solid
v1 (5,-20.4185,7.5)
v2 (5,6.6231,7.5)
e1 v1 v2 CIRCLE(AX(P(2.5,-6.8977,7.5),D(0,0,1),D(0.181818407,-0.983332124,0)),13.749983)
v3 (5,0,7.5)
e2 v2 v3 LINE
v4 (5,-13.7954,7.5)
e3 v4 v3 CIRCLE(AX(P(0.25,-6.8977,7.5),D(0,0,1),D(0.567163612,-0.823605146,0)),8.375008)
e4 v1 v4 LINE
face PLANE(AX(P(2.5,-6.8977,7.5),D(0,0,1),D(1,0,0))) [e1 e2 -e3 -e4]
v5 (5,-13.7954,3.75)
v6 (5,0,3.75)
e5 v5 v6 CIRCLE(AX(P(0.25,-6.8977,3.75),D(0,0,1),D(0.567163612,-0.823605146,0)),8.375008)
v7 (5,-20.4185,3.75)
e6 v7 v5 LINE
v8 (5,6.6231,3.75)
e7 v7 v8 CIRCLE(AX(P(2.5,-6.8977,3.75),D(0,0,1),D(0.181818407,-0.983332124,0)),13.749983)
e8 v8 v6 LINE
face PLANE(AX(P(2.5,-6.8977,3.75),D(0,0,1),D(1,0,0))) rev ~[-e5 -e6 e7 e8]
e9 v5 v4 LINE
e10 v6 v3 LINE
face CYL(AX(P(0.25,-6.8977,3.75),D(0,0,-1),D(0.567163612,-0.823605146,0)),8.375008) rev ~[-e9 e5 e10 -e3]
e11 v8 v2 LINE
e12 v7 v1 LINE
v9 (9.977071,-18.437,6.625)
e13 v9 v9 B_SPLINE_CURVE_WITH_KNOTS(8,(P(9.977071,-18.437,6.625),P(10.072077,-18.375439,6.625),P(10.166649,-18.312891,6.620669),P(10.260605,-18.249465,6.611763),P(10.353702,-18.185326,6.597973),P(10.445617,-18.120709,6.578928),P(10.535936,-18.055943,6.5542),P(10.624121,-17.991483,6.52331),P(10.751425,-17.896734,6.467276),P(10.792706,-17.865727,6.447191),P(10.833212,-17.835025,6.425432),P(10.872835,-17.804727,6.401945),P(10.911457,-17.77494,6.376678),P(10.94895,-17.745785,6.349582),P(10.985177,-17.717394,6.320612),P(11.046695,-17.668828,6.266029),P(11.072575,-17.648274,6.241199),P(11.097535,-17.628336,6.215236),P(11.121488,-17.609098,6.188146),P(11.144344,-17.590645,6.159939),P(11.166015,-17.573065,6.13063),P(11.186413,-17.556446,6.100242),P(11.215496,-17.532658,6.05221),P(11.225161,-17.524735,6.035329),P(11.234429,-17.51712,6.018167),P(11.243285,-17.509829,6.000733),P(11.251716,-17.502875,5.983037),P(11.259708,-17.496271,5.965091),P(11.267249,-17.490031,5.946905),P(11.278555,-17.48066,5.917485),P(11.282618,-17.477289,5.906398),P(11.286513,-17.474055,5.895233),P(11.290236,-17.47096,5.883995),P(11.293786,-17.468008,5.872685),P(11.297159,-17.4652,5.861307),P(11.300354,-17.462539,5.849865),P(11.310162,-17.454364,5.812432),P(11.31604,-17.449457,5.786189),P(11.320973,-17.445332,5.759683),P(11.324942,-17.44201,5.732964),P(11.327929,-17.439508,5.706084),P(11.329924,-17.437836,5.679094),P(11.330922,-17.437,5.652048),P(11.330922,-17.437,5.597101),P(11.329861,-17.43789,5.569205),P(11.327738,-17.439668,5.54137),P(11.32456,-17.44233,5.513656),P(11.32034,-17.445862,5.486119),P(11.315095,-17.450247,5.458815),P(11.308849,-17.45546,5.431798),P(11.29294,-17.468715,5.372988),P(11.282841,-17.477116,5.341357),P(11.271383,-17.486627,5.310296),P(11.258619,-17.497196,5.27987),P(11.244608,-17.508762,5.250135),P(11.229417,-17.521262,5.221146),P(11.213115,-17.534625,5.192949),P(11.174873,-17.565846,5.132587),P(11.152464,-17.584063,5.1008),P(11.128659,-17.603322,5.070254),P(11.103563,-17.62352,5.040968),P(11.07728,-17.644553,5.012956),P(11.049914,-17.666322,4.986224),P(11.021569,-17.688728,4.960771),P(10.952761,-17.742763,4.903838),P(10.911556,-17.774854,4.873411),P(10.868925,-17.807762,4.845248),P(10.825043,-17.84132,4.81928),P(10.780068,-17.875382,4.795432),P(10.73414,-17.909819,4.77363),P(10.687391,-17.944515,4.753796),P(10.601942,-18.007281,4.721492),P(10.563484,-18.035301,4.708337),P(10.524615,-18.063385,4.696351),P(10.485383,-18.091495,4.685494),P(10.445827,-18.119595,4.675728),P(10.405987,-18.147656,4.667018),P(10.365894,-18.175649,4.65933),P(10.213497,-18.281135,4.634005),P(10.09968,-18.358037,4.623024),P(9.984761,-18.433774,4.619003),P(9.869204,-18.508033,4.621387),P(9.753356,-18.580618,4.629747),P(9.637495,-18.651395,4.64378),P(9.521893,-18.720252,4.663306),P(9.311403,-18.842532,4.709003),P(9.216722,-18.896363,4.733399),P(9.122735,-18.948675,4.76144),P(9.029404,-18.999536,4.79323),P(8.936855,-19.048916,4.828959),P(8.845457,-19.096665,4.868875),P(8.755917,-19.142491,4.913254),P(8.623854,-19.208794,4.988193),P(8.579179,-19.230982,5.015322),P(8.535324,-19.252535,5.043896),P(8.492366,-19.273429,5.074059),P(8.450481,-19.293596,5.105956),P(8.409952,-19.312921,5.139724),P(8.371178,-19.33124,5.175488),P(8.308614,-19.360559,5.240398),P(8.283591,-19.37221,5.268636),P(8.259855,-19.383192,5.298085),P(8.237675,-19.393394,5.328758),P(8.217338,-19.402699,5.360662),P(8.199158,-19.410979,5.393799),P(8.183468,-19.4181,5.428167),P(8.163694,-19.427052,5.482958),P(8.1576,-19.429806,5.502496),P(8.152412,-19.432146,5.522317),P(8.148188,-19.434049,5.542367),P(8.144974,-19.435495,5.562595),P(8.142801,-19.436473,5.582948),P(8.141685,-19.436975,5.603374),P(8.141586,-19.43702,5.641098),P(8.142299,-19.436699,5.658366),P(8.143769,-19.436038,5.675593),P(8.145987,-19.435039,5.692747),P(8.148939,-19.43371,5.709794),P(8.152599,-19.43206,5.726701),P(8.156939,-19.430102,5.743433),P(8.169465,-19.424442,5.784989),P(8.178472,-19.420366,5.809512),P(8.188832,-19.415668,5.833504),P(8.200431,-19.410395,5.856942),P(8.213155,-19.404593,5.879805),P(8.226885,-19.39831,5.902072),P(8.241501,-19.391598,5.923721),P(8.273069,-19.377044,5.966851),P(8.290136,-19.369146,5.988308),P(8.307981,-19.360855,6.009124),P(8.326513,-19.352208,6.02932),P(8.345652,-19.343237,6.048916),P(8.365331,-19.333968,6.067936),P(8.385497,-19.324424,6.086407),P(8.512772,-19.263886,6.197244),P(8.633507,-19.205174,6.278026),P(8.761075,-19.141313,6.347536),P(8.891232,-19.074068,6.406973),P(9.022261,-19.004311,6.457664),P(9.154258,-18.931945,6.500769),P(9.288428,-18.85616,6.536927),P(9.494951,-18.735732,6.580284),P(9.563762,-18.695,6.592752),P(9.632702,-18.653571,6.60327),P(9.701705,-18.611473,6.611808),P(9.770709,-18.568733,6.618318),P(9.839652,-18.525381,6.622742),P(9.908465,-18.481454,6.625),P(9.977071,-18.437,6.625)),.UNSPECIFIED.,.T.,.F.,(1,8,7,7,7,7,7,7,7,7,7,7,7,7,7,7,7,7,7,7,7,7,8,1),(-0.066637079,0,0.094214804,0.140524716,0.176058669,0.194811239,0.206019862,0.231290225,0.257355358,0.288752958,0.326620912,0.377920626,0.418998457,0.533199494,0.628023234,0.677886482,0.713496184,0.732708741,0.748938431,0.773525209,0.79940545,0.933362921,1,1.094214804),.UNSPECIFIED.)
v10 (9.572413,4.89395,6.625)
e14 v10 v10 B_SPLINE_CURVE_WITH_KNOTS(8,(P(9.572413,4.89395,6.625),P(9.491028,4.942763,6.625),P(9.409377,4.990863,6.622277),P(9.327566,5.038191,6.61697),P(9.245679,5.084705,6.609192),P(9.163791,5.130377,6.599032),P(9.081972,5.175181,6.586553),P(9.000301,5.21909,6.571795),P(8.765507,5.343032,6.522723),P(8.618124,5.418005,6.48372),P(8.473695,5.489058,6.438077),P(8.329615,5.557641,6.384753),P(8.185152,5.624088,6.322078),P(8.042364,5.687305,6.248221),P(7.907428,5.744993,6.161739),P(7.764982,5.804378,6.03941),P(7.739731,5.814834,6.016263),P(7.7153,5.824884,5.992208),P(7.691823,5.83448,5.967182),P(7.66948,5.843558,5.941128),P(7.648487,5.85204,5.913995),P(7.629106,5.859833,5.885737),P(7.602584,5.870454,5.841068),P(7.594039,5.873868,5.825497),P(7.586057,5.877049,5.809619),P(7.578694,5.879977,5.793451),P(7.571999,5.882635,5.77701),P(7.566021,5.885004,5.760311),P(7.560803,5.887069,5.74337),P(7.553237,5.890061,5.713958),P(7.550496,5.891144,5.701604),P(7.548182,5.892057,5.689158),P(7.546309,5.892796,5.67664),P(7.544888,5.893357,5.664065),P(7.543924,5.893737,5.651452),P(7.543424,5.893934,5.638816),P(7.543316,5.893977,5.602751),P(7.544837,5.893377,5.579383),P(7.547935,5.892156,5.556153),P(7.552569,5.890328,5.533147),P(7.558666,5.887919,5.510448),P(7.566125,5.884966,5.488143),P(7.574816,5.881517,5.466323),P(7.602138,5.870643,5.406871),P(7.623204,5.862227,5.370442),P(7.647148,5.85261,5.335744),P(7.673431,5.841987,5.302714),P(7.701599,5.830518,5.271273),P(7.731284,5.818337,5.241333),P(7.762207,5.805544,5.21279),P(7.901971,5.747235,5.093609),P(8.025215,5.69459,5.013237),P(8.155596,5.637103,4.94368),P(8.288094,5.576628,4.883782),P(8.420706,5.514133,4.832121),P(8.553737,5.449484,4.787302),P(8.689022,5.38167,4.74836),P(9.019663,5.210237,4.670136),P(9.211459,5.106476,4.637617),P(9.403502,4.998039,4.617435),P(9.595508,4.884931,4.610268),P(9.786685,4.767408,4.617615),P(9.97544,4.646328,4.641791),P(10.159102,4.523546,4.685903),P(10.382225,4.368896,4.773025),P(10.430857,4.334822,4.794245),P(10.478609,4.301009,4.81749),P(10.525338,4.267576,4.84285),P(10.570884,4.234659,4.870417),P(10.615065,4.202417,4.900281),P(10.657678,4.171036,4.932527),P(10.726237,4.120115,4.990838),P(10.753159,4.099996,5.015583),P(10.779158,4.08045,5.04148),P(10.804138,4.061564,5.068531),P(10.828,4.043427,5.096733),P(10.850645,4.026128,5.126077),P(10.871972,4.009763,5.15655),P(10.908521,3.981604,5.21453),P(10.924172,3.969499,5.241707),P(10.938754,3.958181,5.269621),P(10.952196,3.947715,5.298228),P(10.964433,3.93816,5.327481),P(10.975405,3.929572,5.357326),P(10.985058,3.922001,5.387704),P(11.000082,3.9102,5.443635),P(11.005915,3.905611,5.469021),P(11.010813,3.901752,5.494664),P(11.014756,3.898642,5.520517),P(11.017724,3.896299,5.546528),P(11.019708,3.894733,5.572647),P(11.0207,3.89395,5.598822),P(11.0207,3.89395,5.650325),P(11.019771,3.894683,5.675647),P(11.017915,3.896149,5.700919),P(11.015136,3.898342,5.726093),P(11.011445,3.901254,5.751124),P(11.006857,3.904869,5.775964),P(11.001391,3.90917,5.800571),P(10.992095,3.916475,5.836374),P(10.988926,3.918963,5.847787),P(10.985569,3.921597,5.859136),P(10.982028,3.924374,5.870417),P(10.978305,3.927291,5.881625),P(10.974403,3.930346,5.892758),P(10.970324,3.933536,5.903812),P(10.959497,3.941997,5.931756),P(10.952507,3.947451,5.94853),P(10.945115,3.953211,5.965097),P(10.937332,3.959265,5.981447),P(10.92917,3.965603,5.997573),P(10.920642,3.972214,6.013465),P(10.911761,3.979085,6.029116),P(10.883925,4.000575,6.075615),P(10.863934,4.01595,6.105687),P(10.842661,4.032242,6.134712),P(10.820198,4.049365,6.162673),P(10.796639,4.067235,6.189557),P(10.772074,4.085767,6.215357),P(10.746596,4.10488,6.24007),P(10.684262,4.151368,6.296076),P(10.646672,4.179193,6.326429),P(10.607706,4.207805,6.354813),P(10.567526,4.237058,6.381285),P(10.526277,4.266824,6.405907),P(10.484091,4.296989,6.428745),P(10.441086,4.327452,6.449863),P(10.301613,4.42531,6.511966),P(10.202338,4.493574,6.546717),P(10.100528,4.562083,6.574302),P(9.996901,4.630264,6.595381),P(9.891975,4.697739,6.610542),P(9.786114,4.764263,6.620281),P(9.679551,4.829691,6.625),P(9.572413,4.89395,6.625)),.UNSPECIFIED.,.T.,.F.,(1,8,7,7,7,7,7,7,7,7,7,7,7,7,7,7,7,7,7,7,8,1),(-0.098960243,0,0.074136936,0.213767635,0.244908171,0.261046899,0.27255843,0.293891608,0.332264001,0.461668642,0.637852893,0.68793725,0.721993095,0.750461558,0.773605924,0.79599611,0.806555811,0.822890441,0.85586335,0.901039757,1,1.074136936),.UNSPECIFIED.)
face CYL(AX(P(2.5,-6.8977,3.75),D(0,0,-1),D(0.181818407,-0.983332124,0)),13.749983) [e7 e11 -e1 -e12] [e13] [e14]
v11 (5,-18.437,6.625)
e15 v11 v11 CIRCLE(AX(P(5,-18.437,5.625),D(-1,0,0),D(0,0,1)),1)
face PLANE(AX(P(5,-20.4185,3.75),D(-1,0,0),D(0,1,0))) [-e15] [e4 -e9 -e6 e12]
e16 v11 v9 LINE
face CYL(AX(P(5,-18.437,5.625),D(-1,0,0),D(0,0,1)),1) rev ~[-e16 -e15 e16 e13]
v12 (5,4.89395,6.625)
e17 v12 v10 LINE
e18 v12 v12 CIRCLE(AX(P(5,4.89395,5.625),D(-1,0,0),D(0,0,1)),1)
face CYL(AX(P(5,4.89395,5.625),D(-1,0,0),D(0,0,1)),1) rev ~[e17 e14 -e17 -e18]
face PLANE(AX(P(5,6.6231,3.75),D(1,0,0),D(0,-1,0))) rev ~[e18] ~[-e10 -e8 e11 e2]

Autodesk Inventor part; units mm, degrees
ref_plane "YZ Plane" through (0, 0, 0) normal (1, 0, 0) x (0, 1, 0)
ref_plane "XZ Plane" through (0, 0, 0) normal (0, 1, 0) x (-1, 0, 0)
ref_plane "XY Plane" through (0, 0, 0) normal (0, 0, 1) x (1, 0, 0)
sketch "Sketch1" plane through (0, 0, 0) normal (0, 0, 1) x (1, 0, 0)
  arc A0 (5, -27.0416) -> (5, 27.0416) centre (0, 0) ccw
  line L0 (9.25, 0) -> (0.933, 0)
  line L1 (5, -27.5) -> (5, -13.7954)
  arc A1 (5, -13.7954) -> (5, 13.7954) centre (-4.5, 0) ccw
  arc A2 (5, -27.0416) -> (5, 27.0416) centre (0, 0) ccw
  line L2 (5, 27.5) -> (5, 13.7954)
  line L3 (5, -13.7954) -> (5, -27.5)
  point P0 (-3.7885, 24.6247)
extrude "Extrusion1" add sketch "Sketch1" along normal blind 7.5
sketch "Sketch3" plane through (5, -27.0416, 0) normal (-1, 0, 0) x (0, 0, 1)
  line L0 (0, 6.9167) -> (7.5, 6.9167)
  line L1 (0, 0) -> (0, 6.9167)
  line L2 (0, 6.9167) -> (7.5, 6.9167)
  line L3 (7.5, 26.7893) -> (7.5, 0)
  line L4 (7.5, 6.9167) -> (7.5, 0)
  line L5 (7.5, 0) -> (0, 0)
  line L6 (7.5, 0) -> (0, 0)
  circle A0 centre (3.75, 3.963) radius 1
  line L7 (0, 0) -> (0, 53.5786)
  line L8 (0, 53.5786) -> (0, 0)
  line L9 (0, 26.7893) -> (7.5, 26.7893)
  circle A1 centre (3.75, 50.6249) radius 1
  line L10 (0, 53.5786) -> (7.5, 53.5786)
  line L11 (7.5, 53.5786) -> (7.5, 0)
  line L12 (7.5, 54.0833) -> (0.9403, 54.0833)
  line L13 (0, 54.0833) -> (7.5, 54.0833) projected
  circle A2 centre (3.75, 3.963) radius 2
  circle A3 centre (3.75, 50.6249) radius 2
  point P0 (0, 27.0416)
  point P1 (280.32, 51.414)
  dimension "d7" = 2
  dimension "d10" = 4
  dimension "d11" = 4
extrude "Extrusion3" cut sketch "Sketch3" against normal blind 25.4 contours A0 | A1
extrude "Extrusion4" cut sketch "Sketch3" against normal blind 17.9375 contours A2 | A3
scale "Scale1" factors (0.5, 0.5, 0.5) then translate (2.5, -6.8977, 3.75) bodies 1
properties part number "Contrapeso2"
